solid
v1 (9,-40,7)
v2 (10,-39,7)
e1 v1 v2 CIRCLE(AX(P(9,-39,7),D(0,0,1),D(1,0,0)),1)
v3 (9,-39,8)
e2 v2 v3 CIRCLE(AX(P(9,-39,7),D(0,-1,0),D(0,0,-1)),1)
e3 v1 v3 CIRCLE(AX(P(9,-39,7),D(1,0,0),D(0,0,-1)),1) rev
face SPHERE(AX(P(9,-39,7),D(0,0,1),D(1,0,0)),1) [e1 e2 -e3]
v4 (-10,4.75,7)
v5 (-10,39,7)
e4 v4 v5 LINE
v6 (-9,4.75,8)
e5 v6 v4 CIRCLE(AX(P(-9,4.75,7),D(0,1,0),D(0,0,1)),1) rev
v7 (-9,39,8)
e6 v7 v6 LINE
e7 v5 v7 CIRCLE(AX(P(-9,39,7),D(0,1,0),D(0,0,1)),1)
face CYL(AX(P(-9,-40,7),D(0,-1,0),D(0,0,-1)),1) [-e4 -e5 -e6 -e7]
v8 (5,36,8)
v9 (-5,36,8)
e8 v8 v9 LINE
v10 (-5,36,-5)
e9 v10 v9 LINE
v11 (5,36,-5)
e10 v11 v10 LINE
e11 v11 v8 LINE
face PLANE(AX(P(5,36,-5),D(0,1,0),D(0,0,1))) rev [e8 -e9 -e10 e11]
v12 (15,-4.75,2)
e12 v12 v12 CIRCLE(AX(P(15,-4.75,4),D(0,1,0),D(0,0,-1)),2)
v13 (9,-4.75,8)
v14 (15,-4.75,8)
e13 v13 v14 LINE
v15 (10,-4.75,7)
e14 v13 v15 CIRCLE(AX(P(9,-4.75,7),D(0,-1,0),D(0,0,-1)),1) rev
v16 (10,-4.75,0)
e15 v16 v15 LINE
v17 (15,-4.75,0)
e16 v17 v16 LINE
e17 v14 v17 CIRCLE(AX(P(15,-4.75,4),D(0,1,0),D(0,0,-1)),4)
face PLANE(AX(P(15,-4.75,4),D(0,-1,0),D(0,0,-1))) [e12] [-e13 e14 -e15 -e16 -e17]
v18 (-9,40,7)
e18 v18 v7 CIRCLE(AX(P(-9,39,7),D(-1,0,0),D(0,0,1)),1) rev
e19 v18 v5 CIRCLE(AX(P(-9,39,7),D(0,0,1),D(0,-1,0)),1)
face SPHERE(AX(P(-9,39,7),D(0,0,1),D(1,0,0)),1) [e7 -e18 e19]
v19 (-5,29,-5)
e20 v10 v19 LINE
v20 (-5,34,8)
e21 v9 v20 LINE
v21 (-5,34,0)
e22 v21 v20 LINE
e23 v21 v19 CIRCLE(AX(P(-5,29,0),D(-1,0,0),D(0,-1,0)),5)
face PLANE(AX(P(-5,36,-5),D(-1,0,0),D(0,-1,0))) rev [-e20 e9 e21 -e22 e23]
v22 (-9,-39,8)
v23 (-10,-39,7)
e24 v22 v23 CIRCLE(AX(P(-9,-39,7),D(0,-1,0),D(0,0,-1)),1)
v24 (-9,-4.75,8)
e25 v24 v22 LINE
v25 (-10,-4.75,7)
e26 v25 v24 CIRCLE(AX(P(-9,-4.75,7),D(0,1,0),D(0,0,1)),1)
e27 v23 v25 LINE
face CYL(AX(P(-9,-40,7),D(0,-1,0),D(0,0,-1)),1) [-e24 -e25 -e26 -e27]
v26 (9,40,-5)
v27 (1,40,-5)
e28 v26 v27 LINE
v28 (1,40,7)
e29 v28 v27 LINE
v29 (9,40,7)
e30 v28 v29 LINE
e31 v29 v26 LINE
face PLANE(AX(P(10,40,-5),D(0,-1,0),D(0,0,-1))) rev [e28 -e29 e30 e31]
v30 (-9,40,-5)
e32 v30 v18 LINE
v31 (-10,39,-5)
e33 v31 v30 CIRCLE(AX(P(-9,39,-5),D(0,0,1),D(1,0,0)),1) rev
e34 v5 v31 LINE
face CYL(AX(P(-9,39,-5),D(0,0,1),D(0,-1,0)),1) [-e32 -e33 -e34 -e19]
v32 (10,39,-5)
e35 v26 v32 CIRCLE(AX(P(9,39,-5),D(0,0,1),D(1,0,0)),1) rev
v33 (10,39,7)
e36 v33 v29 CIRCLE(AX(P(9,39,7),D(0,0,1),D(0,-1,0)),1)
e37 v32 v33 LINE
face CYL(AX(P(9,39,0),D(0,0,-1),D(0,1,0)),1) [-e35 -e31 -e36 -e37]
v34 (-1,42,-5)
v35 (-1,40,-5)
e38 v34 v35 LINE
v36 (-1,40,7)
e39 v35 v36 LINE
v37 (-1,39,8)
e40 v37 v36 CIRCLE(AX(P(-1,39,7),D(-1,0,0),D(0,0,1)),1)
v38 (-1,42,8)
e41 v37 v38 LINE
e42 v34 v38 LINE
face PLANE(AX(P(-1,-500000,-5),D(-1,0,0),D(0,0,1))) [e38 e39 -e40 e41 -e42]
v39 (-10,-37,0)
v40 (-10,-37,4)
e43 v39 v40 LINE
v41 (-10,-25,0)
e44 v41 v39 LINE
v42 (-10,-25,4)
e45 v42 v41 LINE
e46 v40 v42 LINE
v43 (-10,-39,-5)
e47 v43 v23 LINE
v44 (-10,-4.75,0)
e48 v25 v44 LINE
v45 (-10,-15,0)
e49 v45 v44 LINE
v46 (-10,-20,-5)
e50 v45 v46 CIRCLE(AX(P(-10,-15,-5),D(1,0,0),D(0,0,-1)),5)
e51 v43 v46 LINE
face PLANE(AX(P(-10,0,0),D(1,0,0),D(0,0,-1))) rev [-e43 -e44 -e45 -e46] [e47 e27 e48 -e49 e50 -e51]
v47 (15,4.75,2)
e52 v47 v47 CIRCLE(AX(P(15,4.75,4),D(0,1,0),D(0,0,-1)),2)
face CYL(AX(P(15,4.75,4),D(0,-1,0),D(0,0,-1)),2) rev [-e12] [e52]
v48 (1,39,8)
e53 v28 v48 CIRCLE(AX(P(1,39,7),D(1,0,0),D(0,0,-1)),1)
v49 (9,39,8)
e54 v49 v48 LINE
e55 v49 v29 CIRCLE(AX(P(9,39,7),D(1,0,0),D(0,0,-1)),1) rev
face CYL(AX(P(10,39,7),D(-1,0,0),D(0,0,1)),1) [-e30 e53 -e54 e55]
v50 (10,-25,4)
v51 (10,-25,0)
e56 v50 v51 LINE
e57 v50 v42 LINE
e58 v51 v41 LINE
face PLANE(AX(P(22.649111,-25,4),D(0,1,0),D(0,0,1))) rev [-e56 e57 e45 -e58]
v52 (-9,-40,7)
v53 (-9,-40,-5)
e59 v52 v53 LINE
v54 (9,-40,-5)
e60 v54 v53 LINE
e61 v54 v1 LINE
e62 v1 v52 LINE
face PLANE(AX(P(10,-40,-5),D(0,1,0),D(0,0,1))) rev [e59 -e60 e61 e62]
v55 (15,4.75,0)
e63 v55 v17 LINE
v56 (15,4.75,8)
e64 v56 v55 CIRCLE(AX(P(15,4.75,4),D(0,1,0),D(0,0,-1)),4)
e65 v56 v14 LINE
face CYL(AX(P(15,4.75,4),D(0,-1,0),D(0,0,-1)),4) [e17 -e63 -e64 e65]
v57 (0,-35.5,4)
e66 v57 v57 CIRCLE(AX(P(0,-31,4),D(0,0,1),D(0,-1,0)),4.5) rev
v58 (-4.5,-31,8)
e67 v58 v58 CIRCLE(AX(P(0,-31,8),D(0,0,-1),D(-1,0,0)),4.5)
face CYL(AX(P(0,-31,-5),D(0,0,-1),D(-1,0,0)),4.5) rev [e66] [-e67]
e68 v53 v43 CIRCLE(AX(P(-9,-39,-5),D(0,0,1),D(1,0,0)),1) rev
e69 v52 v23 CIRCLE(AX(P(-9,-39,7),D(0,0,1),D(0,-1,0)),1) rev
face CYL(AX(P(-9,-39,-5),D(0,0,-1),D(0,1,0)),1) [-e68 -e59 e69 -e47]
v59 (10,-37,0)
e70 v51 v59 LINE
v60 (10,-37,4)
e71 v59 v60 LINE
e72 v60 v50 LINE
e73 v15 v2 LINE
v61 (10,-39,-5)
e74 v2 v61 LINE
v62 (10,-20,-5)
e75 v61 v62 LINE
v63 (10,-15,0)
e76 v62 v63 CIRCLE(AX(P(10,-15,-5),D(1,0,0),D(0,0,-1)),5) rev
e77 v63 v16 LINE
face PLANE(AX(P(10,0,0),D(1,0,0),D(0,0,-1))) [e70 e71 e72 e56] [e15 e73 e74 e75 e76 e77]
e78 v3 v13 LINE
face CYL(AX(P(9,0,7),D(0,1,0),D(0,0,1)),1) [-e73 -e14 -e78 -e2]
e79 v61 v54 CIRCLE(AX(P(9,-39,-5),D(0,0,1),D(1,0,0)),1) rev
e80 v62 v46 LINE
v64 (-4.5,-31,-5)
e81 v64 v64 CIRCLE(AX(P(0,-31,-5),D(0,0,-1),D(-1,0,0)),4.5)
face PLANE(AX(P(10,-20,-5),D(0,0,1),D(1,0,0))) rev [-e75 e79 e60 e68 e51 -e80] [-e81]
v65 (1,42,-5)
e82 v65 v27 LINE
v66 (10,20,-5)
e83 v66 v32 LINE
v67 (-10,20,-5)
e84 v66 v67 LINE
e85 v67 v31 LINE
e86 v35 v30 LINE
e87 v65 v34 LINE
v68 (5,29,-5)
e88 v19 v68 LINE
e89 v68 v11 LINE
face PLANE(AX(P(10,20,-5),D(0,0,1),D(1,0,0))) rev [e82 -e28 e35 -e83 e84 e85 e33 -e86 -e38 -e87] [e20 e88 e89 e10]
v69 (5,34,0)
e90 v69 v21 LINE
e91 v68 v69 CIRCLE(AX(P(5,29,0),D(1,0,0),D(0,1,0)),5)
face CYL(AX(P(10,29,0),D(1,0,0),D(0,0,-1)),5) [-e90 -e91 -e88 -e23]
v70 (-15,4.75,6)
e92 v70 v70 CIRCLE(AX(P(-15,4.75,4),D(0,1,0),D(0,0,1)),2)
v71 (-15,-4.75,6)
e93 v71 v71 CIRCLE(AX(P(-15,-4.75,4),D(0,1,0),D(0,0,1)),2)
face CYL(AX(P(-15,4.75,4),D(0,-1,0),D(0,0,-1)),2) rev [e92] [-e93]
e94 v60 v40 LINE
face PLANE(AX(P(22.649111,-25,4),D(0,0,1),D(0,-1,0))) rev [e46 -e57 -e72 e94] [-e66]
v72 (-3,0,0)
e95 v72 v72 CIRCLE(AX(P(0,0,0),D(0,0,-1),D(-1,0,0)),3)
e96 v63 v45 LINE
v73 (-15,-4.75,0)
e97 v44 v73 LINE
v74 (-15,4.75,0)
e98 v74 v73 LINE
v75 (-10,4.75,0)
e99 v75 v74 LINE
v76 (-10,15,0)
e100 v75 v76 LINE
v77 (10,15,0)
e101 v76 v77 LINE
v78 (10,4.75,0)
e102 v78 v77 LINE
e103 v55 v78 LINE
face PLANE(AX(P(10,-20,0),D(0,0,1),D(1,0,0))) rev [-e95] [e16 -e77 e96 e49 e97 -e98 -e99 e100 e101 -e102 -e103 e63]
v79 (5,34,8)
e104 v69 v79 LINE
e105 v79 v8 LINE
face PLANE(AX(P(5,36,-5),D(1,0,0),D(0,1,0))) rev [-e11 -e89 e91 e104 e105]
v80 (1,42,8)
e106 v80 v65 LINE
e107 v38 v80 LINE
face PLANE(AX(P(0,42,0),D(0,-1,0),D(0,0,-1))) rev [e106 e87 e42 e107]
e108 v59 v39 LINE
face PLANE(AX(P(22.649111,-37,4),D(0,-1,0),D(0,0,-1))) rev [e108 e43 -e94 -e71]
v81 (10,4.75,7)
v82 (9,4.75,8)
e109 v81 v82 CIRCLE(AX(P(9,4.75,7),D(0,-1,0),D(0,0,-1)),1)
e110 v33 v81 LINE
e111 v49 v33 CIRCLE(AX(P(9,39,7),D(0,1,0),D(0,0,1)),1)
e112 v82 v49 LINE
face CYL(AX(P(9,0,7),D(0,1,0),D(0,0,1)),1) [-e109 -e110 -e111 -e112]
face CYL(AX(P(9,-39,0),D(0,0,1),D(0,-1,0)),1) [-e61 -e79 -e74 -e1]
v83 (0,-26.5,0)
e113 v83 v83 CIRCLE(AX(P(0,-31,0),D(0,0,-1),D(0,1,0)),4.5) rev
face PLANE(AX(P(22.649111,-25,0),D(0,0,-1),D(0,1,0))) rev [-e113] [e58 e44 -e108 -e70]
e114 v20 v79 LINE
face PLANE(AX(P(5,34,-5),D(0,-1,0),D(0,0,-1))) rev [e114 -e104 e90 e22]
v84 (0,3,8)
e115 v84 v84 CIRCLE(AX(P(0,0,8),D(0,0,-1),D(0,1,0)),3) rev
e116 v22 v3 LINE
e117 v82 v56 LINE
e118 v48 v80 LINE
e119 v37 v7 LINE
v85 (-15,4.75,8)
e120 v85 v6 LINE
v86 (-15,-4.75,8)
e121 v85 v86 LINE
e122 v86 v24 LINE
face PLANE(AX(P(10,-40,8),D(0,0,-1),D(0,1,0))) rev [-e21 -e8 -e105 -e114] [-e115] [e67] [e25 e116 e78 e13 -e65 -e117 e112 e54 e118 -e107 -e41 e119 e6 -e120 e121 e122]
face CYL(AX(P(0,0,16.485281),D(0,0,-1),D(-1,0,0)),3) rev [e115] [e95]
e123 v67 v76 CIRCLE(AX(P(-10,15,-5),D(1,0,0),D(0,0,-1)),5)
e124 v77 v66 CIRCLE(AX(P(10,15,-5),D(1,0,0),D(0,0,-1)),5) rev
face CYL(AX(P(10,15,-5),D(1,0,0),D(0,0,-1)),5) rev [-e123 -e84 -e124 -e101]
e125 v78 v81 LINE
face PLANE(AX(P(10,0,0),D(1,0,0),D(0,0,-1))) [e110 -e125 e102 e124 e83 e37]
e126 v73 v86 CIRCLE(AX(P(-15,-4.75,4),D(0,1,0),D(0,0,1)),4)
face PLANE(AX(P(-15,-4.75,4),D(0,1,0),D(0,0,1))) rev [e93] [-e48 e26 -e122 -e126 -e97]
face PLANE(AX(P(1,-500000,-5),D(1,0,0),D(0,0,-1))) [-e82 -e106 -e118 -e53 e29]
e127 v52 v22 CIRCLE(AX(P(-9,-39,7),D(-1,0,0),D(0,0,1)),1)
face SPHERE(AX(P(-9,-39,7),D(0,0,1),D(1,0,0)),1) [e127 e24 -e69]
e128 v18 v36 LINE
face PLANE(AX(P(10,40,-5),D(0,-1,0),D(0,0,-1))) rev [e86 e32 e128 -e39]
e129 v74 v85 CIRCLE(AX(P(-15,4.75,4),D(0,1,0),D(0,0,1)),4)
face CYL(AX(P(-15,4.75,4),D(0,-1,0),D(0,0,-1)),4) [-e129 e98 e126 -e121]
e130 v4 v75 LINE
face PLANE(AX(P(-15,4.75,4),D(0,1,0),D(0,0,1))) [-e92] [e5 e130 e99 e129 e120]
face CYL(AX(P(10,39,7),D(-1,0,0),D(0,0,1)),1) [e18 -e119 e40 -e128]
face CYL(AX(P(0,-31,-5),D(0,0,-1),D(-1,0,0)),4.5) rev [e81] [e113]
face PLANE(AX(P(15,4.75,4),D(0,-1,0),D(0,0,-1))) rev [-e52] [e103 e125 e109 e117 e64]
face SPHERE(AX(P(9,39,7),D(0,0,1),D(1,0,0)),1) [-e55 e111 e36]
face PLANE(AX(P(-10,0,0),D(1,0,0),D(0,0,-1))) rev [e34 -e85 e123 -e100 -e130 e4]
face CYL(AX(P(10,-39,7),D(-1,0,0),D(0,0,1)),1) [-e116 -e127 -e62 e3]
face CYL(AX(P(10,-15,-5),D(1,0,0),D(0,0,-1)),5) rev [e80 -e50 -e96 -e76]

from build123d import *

# Parameters (mm, degrees)
BOSS_EXTRUDE1_DEPTH      = 10
SKETCH7_R                = 2
BOSS_EXTRUDE4_DEPTH      = 4.75
SKETCH8_R                = 3
CUT_EXTRUDE1_DEPTH       = 8
FILLET1_R                = 1
M8_CLEARANCE_HOLE1_D     = 9
FILLET2_R                = 5
SKETCH15_W               = 4
SKETCH15_H               = 12
CUT_EXTRUDE2_DEPTH       = 20
SKETCH16_W               = 10
SKETCH16_H               = 2
CUT_EXTRUDE3_DEPTH       = 47.151923037
FILLET3_R                = 5
BOSS_EXTRUDE5_DEPTH      = 2
BOSS_EXTRUDE5_DEPTH_BACK = 2
SKETCH17_W               = 2
SKETCH17_H               = 13


with BuildPart() as part:
    # Sketch1 → Boss-Extrude1 (new, symmetric)
    with BuildSketch(Plane(origin=(0, 0, 0), x_dir=(0, 0, -1), z_dir=(1, 0, 0))):
        Polygon((0, -20), (0, 20), (5, 20), (5, 40), (-8, 40), (-8, 20), (-8, -20), (-8, -40), (5, -40), (5, -20), align=None)
    extrude(amount=BOSS_EXTRUDE1_DEPTH, both=True)

    # Sketch7 → Boss-Extrude4 (add, symmetric)
    # profile 1 of 2: a face of its own
    with BuildSketch(Plane(origin=(0, 0, 0), x_dir=(1, 0, 0), z_dir=(0, 1, 0))):
        with BuildLine():
            Line((-15, 0), (-10, 0))
            Line((-10, 0), (-10, -8))
            Line((-10, -8), (-15, -8))
            ThreePointArc((-15, -8), (-19, -4), (-15, 0))
        make_face()
        with Locations(Location((-15, -4, 0), (0, 0, 270))):
            Circle(SKETCH7_R, mode=Mode.SUBTRACT)
    # profile 2 of 2: a face of its own
    with BuildSketch(Plane(origin=(0, 0, 0), x_dir=(1, 0, 0), z_dir=(0, 1, 0))):
        with BuildLine():
            Line((15, -8), (10, -8))
            Line((10, -8), (10, 0))
            Line((10, 0), (15, 0))
            ThreePointArc((15, 0), (19, -4), (15, -8))
        make_face()
        with Locations(Location((15, -4, 0), (0, 0, 90))):
            Circle(SKETCH7_R, mode=Mode.SUBTRACT)
    extrude(amount=BOSS_EXTRUDE4_DEPTH, both=True)

    # Sketch8 → Cut-Extrude1 (cut)
    with BuildSketch(Plane(origin=(0, 0, 0), x_dir=(-1, 0, 0), z_dir=(0, 0, -1))):
        Circle(SKETCH8_R)
    extrude(amount=-CUT_EXTRUDE1_DEPTH, mode=Mode.SUBTRACT)

    # Fillet1
    fillet1_edges = [part.edges().sort_by_distance(p)[0] for p in [
        (-10, -40, 1.5),
        (10, -40, 1.5),
        (-10, 40, 1.5),
        (10, 40, 1.5),
        (0, -40, 8),
        (-10, -22.375, 8),
        (10, -22.375, 8),
        (10, 22.375, 8),
        (0, 40, 8),
        (-10, 22.375, 8),
    ]]
    fillet(fillet1_edges, radius=FILLET1_R)

    # M8 Clearance Hole1 (through all)
    with Locations(Plane(origin=(0, -31, -5), x_dir=(-1, 0, 0), z_dir=(0, 0, -1))):
        with Locations((0, 0)):
            Hole(M8_CLEARANCE_HOLE1_D / 2)

    # Fillet2
    fillet2_edges = [part.edges().sort_by_distance(p)[0] for p in [
        (0, 20, 0),
        (0, -20, 0),
    ]]
    fillet(fillet2_edges, radius=FILLET2_R - 0.0001)  # a hair under: the kernel refuses the full size

    # Sketch15 → Cut-Extrude2 (cut)
    with BuildSketch(Plane.ZY.offset(10)):
        with Locations((2, -31)):
            Rectangle(SKETCH15_W, SKETCH15_H)
    extrude(amount=-CUT_EXTRUDE2_DEPTH, mode=Mode.SUBTRACT)

    # Sketch16 → Cut-Extrude3 (cut, through all)
    with BuildSketch(Plane.XY.offset(8)):
        with Locations((0, 35)):
            Rectangle(SKETCH16_W, SKETCH16_H)
    extrude(amount=-CUT_EXTRUDE3_DEPTH, mode=Mode.SUBTRACT)

    # Fillet3
    fillet3_edges = [part.edges().sort_by_distance(p)[0] for p in [
        (0, 34, -5),
    ]]
    fillet(fillet3_edges, radius=FILLET3_R)

    # Sketch17 → Boss-Extrude5 (add, two sides: drawn at the far end of the back side and taken through both)
    with BuildSketch(Plane(origin=(0, 40, 0), x_dir=(1, 0, 0), z_dir=(0, 1, 0)).offset(-BOSS_EXTRUDE5_DEPTH_BACK)):
        with Locations((0, -1.5)):
            Rectangle(SKETCH17_W, SKETCH17_H)
    extrude(amount=BOSS_EXTRUDE5_DEPTH + BOSS_EXTRUDE5_DEPTH_BACK)


solid = part.part
